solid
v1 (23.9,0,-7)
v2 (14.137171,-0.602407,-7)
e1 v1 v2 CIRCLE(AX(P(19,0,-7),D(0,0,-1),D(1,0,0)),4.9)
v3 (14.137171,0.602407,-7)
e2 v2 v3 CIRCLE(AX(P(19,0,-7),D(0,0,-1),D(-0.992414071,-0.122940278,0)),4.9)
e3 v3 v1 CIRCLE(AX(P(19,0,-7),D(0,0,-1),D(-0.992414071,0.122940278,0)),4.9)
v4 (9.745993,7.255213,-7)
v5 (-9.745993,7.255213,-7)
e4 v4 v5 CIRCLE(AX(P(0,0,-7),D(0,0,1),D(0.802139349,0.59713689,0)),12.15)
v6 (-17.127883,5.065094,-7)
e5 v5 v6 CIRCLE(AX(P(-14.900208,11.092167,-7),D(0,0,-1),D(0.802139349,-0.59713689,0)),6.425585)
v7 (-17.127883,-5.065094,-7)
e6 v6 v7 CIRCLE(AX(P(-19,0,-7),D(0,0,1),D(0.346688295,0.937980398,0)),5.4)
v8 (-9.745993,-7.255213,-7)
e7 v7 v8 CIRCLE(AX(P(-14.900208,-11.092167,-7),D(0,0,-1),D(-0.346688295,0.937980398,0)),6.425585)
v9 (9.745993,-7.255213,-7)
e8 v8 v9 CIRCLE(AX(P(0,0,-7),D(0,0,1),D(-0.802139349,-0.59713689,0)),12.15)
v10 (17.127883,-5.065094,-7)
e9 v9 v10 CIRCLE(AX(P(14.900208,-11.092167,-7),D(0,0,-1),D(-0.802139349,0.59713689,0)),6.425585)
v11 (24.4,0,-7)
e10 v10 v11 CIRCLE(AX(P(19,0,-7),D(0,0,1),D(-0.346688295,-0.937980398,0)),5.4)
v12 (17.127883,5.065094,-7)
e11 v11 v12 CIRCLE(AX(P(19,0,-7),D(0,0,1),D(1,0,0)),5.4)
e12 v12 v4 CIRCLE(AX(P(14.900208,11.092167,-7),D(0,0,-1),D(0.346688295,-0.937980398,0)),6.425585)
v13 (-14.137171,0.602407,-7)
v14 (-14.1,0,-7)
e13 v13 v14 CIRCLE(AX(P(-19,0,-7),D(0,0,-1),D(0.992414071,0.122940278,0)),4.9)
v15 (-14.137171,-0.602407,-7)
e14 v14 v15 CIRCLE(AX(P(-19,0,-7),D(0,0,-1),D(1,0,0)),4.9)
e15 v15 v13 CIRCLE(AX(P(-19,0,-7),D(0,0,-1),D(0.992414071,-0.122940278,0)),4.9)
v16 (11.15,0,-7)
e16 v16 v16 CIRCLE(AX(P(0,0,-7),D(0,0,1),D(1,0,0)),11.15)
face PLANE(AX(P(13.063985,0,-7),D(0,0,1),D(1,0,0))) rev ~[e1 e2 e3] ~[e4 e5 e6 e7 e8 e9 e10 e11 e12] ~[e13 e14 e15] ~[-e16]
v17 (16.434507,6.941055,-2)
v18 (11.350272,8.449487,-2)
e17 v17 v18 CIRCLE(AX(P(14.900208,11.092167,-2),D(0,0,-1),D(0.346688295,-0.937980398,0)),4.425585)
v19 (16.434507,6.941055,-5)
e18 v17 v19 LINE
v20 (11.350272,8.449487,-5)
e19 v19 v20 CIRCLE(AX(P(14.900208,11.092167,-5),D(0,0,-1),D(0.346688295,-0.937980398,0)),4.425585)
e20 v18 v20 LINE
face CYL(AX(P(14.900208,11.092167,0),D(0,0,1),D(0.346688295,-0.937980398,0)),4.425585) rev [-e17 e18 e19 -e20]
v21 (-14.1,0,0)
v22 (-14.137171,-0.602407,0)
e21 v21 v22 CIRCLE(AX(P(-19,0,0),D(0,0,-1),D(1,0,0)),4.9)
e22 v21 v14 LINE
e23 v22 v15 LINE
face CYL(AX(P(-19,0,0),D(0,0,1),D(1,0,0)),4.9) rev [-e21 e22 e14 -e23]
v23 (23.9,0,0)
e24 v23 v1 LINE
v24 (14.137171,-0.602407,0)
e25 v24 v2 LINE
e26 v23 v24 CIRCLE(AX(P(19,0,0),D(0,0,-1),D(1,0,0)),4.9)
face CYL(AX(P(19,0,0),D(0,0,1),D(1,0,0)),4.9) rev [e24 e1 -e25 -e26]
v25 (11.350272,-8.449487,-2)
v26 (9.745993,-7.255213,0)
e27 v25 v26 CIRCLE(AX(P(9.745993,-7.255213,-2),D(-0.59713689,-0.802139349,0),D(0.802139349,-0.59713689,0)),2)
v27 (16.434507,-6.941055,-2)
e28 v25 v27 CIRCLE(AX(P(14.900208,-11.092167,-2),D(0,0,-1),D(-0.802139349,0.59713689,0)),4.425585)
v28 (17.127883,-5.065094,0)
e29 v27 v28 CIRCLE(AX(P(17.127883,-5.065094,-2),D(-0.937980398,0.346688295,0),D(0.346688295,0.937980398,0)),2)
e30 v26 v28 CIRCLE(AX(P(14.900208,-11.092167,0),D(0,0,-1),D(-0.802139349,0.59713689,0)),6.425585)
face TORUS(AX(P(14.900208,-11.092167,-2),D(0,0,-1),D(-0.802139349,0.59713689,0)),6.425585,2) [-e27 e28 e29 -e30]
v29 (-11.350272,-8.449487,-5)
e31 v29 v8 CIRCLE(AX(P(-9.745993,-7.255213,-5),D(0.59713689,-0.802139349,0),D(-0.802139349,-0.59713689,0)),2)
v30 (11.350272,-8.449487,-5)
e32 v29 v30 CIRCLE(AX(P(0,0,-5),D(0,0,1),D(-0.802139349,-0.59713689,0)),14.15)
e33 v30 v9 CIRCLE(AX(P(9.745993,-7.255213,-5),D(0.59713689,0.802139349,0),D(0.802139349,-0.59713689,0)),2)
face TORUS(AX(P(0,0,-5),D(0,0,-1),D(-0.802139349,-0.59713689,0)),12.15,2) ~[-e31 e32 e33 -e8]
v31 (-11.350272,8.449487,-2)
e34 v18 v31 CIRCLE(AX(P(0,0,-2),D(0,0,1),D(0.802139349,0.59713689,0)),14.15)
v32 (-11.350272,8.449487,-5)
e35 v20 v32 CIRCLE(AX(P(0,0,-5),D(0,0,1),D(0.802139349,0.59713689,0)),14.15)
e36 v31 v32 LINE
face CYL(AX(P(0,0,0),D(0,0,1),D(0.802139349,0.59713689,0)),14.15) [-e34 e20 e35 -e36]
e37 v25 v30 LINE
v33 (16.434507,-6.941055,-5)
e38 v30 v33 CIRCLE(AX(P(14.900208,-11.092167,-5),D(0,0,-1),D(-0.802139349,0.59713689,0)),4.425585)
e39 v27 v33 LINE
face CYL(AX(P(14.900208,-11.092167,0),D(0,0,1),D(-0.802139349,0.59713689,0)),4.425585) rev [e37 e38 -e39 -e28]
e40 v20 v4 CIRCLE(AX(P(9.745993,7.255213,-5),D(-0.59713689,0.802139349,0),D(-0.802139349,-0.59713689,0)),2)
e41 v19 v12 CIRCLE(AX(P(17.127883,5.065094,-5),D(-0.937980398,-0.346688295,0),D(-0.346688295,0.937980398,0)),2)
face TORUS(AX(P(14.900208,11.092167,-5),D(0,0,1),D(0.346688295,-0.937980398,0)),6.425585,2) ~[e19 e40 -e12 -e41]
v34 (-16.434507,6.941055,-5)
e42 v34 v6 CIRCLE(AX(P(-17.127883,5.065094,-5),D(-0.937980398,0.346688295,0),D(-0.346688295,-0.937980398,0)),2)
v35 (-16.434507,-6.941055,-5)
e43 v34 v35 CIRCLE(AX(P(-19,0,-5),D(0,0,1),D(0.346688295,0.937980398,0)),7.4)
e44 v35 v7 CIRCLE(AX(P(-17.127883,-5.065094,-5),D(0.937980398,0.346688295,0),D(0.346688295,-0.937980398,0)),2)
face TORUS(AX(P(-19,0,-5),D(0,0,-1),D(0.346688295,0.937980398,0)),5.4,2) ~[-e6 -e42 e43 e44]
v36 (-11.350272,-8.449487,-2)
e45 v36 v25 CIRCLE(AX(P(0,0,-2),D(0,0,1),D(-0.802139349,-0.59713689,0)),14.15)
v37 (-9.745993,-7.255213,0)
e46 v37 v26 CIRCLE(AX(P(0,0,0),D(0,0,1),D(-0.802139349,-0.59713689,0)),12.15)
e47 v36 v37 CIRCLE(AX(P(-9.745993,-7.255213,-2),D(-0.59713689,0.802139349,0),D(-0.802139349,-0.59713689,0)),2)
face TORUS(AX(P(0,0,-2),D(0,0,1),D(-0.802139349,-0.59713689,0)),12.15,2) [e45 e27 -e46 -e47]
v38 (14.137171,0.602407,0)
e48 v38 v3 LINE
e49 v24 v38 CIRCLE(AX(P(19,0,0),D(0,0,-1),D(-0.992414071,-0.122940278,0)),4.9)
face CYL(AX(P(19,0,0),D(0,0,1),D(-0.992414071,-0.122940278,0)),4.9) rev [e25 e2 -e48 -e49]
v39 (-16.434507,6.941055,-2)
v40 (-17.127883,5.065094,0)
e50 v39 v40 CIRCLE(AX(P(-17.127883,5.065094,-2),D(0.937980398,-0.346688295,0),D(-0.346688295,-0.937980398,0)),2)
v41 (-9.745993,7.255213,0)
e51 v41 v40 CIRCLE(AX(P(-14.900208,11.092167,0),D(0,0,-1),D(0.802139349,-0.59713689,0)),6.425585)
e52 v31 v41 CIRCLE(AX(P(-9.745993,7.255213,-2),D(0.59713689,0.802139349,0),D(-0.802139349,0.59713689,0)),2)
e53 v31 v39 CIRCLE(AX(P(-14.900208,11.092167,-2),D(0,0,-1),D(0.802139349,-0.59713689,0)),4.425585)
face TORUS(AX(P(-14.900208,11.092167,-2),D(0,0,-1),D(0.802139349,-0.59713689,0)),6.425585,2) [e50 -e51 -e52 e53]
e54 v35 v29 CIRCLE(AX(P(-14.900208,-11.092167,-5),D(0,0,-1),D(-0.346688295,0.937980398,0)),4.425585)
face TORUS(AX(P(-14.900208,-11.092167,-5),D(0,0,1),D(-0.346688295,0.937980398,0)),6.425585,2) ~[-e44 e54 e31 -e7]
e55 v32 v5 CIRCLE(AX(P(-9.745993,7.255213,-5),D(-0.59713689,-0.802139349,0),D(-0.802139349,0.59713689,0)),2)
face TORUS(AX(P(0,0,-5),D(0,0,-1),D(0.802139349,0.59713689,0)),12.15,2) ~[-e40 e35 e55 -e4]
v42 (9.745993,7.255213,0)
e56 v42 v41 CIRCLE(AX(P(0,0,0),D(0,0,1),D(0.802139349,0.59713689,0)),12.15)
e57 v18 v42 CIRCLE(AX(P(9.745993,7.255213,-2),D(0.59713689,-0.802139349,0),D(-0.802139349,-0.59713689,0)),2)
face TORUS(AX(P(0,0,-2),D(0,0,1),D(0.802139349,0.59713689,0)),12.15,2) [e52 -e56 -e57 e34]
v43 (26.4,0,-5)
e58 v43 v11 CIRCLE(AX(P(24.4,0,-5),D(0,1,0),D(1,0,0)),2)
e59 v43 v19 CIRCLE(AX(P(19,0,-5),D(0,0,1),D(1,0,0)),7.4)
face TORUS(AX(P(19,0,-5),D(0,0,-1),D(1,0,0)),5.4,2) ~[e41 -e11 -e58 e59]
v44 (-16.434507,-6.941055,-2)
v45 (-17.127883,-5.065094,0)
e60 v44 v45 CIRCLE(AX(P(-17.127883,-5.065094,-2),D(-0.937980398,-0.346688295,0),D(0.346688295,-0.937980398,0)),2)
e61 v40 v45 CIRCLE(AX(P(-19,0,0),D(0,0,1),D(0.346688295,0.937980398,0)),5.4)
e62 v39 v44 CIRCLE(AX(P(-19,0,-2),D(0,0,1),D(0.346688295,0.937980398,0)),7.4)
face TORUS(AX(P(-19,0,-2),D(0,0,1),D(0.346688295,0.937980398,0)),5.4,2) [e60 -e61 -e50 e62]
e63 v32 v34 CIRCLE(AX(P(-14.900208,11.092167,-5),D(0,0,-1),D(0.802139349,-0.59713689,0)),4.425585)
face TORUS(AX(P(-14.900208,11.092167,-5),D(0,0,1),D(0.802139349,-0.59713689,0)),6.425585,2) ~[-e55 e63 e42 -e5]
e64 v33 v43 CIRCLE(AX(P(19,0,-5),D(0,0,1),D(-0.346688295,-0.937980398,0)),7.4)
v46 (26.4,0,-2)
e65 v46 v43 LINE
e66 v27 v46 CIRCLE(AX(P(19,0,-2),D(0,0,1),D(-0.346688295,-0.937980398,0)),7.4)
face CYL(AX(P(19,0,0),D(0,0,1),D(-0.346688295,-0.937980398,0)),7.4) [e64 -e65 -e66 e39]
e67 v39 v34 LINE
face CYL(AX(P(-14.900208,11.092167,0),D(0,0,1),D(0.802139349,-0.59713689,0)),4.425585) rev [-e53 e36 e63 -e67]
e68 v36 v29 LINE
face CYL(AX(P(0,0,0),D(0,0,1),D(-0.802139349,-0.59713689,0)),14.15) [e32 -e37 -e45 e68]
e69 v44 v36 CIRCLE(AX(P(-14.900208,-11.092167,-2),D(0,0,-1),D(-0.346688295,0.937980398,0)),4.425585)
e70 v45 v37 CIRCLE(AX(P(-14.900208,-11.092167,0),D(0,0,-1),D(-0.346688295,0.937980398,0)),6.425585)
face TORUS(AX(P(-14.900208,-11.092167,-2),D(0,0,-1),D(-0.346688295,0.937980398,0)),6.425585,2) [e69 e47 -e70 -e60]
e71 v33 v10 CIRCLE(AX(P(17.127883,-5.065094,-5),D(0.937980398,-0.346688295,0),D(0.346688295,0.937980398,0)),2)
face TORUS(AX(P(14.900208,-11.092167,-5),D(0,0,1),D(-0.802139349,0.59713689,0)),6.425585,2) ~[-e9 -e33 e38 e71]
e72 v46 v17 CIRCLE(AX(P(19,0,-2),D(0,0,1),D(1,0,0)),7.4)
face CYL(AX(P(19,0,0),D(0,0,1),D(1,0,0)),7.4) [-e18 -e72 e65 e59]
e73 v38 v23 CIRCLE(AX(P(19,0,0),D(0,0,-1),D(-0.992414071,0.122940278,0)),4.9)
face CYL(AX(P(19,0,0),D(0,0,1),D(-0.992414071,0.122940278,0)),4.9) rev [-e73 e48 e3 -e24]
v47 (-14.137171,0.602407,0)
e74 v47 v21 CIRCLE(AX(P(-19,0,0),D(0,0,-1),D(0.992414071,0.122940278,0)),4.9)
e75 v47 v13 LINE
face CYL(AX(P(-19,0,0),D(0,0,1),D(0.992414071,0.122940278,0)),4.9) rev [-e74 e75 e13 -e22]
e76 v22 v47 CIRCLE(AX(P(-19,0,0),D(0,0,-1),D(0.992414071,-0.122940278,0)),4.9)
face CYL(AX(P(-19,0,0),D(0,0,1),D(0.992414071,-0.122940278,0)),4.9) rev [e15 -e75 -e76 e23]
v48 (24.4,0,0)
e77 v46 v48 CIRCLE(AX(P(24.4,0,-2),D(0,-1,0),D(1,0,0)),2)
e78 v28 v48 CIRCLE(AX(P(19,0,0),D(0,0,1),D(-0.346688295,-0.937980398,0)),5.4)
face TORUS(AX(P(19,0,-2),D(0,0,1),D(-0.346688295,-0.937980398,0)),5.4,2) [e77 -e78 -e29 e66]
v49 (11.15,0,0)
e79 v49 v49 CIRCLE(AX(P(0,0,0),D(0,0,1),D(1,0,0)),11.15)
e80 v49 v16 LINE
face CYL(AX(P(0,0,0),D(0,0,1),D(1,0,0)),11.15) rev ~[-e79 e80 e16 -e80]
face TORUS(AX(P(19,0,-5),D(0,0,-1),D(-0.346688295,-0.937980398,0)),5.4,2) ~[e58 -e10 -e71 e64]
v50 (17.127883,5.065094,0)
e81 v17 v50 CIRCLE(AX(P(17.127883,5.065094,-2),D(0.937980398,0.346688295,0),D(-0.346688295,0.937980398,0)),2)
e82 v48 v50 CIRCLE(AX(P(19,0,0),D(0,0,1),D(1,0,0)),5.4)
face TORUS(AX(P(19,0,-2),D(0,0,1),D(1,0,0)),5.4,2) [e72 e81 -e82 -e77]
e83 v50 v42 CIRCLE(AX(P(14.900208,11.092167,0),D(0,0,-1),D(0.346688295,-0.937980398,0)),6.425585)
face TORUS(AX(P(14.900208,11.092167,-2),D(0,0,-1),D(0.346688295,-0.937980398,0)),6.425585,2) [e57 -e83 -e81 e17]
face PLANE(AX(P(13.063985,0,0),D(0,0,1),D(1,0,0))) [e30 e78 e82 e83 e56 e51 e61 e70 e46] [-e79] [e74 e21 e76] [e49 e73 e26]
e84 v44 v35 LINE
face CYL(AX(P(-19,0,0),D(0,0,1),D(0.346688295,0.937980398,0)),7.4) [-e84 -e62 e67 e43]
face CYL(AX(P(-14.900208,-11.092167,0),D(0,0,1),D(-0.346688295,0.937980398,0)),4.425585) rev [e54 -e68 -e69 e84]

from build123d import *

# Parameters (mm, degrees)
F0_R     = 11.15
F1_DEPTH = 7
F2_R     = 2


# Not quite as in the source:
# - a feature names something its author has since deleted; it is built from what else it names


with BuildPart() as f1:
    # F0 (on Top) → F1 (new body)
    with BuildSketch(Plane.XY):
        with BuildLine():
            ThreePointArc((14.1371710526, 0.602407361), (13.8884683868, 2.7079412603), (13.3279605263, 4.752680108))
            ThreePointArc((13.3279605263, 4.752680108), (11.6, 0), (13.3279605263, -4.752680108))
            ThreePointArc((13.3279605263, -4.752680108), (13.8884683868, -2.7079412603), (14.1371710526, -0.602407361))
            ThreePointArc((14.1371710526, -0.602407361), (14.1, 0), (14.1371710526, 0.602407361))
        make_face()
        with BuildLine():
            ThreePointArc((16.434506619, 6.9410549423), (14.738370853, 6.0496708186), (13.3279605263, 4.752680108))
            ThreePointArc((13.3279605263, 4.752680108), (13.8884683868, 2.7079412603), (14.1371710526, 0.602407361))
            ThreePointArc((14.1371710526, 0.602407361), (19.3017765381, 4.8906984083), (23.9, 0))
            ThreePointArc((23.9, 0), (19.3017765381, -4.8906984083), (14.1371710526, -0.602407361))
            ThreePointArc((14.1371710526, -0.602407361), (13.8884683868, -2.7079412603), (13.3279605263, -4.752680108))
            ThreePointArc((13.3279605263, -4.752680108), (14.738370853, -6.0496708186), (16.434506619, -6.9410549423))
            ThreePointArc((16.434506619, -6.9410549423), (23.2293822824, -6.0722586827), (26.4, 0))
            ThreePointArc((26.4, 0), (23.2293822824, 6.0722586827), (16.434506619, 6.9410549423))
        make_face()
        with BuildLine():
            ThreePointArc((13.3279605263, 4.752680108), (12.4767937703, 6.6747372393), (11.3502717852, 8.4494869905))
            ThreePointArc((11.3502717852, 8.4494869905), (0, 14.15), (-11.3502717852, 8.4494869905))
            ThreePointArc((-11.3502717852, 8.4494869905), (-12.4767937703, 6.6747372393), (-13.3279605263, 4.752680108))
            ThreePointArc((-13.3279605263, 4.752680108), (-12.0453938967, 2.5285280199), (-11.6, 0))
            ThreePointArc((-11.6, 0), (-12.0453938967, -2.5285280199), (-13.3279605263, -4.752680108))
            ThreePointArc((-13.3279605263, -4.752680108), (-12.4767937703, -6.6747372393), (-11.3502717852, -8.4494869905))
            ThreePointArc((-11.3502717852, -8.4494869905), (0, -14.15), (11.3502717852, -8.4494869905))
            ThreePointArc((11.3502717852, -8.4494869905), (12.4767937703, -6.6747372393), (13.3279605263, -4.752680108))
            ThreePointArc((13.3279605263, -4.752680108), (11.6, 0), (13.3279605263, 4.752680108))
        make_face()
        Circle(F0_R, mode=Mode.SUBTRACT)
        with BuildLine():
            ThreePointArc((-11.6, 0), (-12.0453938967, 2.5285280199), (-13.3279605263, 4.752680108))
            ThreePointArc((-13.3279605263, 4.752680108), (-13.8884683868, 2.7079412603), (-14.1371710526, 0.602407361))
            ThreePointArc((-14.1371710526, 0.602407361), (-14.1093015917, 0.3017765381), (-14.1, 0))
            ThreePointArc((-14.1, 0), (-14.1093015917, -0.3017765381), (-14.1371710526, -0.602407361))
            ThreePointArc((-14.1371710526, -0.602407361), (-13.8884683868, -2.7079412603), (-13.3279605263, -4.752680108))
            ThreePointArc((-13.3279605263, -4.752680108), (-12.0453938967, -2.5285280199), (-11.6, 0))
        make_face()
        with BuildLine():
            ThreePointArc((-14.1371710526, 0.602407361), (-13.8884683868, 2.7079412603), (-13.3279605263, 4.752680108))
            ThreePointArc((-13.3279605263, 4.752680108), (-14.738370853, 6.0496708186), (-16.434506619, 6.9410549423))
            ThreePointArc((-16.434506619, 6.9410549423), (-26.4, 0), (-16.434506619, -6.9410549423))
            ThreePointArc((-16.434506619, -6.9410549423), (-14.738370853, -6.0496708186), (-13.3279605263, -4.752680108))
            ThreePointArc((-13.3279605263, -4.752680108), (-13.8884683868, -2.7079412603), (-14.1371710526, -0.602407361))
            ThreePointArc((-14.1371710526, -0.602407361), (-23.9, 0), (-14.1371710526, 0.602407361))
        make_face()
        with BuildLine():
            ThreePointArc((16.434506619, -6.9410549423), (14.738370853, -6.0496708186), (13.3279605263, -4.752680108))
            ThreePointArc((13.3279605263, -4.752680108), (12.4767937703, -6.6747372393), (11.3502717852, -8.4494869905))
            ThreePointArc((11.3502717852, -8.4494869905), (13.6414226502, -6.8493774528), (16.434506619, -6.9410549423))
        make_face()
        with BuildLine():
            ThreePointArc((16.434506619, 6.9410549423), (13.6414226502, 6.8493774528), (11.3502717852, 8.4494869905))
            ThreePointArc((11.3502717852, 8.4494869905), (12.4767937703, 6.6747372393), (13.3279605263, 4.752680108))
            ThreePointArc((13.3279605263, 4.752680108), (14.738370853, 6.0496708186), (16.434506619, 6.9410549423))
        make_face()
        with BuildLine():
            ThreePointArc((-13.3279605263, -4.752680108), (-14.738370853, -6.0496708186), (-16.434506619, -6.9410549423))
            ThreePointArc((-16.434506619, -6.9410549423), (-13.6414226502, -6.8493774528), (-11.3502717852, -8.4494869905))
            ThreePointArc((-11.3502717852, -8.4494869905), (-12.4767937703, -6.6747372393), (-13.3279605263, -4.752680108))
        make_face()
        with BuildLine():
            ThreePointArc((-13.3279605263, 4.752680108), (-12.4767937703, 6.6747372393), (-11.3502717852, 8.4494869905))
            ThreePointArc((-11.3502717852, 8.4494869905), (-13.6414226502, 6.8493774528), (-16.434506619, 6.9410549423))
            ThreePointArc((-16.434506619, 6.9410549423), (-14.738370853, 6.0496708186), (-13.3279605263, 4.752680108))
        make_face()
    extrude(amount=-F1_DEPTH)

    # F2
    f2_edges = [f1.edges().sort_by_distance(p)[0] for p in [
        (0, -14.15, 0),
        (0, -14.15, -7),
    ]]
    fillet(f2_edges, radius=F2_R)


solid = f1.part
